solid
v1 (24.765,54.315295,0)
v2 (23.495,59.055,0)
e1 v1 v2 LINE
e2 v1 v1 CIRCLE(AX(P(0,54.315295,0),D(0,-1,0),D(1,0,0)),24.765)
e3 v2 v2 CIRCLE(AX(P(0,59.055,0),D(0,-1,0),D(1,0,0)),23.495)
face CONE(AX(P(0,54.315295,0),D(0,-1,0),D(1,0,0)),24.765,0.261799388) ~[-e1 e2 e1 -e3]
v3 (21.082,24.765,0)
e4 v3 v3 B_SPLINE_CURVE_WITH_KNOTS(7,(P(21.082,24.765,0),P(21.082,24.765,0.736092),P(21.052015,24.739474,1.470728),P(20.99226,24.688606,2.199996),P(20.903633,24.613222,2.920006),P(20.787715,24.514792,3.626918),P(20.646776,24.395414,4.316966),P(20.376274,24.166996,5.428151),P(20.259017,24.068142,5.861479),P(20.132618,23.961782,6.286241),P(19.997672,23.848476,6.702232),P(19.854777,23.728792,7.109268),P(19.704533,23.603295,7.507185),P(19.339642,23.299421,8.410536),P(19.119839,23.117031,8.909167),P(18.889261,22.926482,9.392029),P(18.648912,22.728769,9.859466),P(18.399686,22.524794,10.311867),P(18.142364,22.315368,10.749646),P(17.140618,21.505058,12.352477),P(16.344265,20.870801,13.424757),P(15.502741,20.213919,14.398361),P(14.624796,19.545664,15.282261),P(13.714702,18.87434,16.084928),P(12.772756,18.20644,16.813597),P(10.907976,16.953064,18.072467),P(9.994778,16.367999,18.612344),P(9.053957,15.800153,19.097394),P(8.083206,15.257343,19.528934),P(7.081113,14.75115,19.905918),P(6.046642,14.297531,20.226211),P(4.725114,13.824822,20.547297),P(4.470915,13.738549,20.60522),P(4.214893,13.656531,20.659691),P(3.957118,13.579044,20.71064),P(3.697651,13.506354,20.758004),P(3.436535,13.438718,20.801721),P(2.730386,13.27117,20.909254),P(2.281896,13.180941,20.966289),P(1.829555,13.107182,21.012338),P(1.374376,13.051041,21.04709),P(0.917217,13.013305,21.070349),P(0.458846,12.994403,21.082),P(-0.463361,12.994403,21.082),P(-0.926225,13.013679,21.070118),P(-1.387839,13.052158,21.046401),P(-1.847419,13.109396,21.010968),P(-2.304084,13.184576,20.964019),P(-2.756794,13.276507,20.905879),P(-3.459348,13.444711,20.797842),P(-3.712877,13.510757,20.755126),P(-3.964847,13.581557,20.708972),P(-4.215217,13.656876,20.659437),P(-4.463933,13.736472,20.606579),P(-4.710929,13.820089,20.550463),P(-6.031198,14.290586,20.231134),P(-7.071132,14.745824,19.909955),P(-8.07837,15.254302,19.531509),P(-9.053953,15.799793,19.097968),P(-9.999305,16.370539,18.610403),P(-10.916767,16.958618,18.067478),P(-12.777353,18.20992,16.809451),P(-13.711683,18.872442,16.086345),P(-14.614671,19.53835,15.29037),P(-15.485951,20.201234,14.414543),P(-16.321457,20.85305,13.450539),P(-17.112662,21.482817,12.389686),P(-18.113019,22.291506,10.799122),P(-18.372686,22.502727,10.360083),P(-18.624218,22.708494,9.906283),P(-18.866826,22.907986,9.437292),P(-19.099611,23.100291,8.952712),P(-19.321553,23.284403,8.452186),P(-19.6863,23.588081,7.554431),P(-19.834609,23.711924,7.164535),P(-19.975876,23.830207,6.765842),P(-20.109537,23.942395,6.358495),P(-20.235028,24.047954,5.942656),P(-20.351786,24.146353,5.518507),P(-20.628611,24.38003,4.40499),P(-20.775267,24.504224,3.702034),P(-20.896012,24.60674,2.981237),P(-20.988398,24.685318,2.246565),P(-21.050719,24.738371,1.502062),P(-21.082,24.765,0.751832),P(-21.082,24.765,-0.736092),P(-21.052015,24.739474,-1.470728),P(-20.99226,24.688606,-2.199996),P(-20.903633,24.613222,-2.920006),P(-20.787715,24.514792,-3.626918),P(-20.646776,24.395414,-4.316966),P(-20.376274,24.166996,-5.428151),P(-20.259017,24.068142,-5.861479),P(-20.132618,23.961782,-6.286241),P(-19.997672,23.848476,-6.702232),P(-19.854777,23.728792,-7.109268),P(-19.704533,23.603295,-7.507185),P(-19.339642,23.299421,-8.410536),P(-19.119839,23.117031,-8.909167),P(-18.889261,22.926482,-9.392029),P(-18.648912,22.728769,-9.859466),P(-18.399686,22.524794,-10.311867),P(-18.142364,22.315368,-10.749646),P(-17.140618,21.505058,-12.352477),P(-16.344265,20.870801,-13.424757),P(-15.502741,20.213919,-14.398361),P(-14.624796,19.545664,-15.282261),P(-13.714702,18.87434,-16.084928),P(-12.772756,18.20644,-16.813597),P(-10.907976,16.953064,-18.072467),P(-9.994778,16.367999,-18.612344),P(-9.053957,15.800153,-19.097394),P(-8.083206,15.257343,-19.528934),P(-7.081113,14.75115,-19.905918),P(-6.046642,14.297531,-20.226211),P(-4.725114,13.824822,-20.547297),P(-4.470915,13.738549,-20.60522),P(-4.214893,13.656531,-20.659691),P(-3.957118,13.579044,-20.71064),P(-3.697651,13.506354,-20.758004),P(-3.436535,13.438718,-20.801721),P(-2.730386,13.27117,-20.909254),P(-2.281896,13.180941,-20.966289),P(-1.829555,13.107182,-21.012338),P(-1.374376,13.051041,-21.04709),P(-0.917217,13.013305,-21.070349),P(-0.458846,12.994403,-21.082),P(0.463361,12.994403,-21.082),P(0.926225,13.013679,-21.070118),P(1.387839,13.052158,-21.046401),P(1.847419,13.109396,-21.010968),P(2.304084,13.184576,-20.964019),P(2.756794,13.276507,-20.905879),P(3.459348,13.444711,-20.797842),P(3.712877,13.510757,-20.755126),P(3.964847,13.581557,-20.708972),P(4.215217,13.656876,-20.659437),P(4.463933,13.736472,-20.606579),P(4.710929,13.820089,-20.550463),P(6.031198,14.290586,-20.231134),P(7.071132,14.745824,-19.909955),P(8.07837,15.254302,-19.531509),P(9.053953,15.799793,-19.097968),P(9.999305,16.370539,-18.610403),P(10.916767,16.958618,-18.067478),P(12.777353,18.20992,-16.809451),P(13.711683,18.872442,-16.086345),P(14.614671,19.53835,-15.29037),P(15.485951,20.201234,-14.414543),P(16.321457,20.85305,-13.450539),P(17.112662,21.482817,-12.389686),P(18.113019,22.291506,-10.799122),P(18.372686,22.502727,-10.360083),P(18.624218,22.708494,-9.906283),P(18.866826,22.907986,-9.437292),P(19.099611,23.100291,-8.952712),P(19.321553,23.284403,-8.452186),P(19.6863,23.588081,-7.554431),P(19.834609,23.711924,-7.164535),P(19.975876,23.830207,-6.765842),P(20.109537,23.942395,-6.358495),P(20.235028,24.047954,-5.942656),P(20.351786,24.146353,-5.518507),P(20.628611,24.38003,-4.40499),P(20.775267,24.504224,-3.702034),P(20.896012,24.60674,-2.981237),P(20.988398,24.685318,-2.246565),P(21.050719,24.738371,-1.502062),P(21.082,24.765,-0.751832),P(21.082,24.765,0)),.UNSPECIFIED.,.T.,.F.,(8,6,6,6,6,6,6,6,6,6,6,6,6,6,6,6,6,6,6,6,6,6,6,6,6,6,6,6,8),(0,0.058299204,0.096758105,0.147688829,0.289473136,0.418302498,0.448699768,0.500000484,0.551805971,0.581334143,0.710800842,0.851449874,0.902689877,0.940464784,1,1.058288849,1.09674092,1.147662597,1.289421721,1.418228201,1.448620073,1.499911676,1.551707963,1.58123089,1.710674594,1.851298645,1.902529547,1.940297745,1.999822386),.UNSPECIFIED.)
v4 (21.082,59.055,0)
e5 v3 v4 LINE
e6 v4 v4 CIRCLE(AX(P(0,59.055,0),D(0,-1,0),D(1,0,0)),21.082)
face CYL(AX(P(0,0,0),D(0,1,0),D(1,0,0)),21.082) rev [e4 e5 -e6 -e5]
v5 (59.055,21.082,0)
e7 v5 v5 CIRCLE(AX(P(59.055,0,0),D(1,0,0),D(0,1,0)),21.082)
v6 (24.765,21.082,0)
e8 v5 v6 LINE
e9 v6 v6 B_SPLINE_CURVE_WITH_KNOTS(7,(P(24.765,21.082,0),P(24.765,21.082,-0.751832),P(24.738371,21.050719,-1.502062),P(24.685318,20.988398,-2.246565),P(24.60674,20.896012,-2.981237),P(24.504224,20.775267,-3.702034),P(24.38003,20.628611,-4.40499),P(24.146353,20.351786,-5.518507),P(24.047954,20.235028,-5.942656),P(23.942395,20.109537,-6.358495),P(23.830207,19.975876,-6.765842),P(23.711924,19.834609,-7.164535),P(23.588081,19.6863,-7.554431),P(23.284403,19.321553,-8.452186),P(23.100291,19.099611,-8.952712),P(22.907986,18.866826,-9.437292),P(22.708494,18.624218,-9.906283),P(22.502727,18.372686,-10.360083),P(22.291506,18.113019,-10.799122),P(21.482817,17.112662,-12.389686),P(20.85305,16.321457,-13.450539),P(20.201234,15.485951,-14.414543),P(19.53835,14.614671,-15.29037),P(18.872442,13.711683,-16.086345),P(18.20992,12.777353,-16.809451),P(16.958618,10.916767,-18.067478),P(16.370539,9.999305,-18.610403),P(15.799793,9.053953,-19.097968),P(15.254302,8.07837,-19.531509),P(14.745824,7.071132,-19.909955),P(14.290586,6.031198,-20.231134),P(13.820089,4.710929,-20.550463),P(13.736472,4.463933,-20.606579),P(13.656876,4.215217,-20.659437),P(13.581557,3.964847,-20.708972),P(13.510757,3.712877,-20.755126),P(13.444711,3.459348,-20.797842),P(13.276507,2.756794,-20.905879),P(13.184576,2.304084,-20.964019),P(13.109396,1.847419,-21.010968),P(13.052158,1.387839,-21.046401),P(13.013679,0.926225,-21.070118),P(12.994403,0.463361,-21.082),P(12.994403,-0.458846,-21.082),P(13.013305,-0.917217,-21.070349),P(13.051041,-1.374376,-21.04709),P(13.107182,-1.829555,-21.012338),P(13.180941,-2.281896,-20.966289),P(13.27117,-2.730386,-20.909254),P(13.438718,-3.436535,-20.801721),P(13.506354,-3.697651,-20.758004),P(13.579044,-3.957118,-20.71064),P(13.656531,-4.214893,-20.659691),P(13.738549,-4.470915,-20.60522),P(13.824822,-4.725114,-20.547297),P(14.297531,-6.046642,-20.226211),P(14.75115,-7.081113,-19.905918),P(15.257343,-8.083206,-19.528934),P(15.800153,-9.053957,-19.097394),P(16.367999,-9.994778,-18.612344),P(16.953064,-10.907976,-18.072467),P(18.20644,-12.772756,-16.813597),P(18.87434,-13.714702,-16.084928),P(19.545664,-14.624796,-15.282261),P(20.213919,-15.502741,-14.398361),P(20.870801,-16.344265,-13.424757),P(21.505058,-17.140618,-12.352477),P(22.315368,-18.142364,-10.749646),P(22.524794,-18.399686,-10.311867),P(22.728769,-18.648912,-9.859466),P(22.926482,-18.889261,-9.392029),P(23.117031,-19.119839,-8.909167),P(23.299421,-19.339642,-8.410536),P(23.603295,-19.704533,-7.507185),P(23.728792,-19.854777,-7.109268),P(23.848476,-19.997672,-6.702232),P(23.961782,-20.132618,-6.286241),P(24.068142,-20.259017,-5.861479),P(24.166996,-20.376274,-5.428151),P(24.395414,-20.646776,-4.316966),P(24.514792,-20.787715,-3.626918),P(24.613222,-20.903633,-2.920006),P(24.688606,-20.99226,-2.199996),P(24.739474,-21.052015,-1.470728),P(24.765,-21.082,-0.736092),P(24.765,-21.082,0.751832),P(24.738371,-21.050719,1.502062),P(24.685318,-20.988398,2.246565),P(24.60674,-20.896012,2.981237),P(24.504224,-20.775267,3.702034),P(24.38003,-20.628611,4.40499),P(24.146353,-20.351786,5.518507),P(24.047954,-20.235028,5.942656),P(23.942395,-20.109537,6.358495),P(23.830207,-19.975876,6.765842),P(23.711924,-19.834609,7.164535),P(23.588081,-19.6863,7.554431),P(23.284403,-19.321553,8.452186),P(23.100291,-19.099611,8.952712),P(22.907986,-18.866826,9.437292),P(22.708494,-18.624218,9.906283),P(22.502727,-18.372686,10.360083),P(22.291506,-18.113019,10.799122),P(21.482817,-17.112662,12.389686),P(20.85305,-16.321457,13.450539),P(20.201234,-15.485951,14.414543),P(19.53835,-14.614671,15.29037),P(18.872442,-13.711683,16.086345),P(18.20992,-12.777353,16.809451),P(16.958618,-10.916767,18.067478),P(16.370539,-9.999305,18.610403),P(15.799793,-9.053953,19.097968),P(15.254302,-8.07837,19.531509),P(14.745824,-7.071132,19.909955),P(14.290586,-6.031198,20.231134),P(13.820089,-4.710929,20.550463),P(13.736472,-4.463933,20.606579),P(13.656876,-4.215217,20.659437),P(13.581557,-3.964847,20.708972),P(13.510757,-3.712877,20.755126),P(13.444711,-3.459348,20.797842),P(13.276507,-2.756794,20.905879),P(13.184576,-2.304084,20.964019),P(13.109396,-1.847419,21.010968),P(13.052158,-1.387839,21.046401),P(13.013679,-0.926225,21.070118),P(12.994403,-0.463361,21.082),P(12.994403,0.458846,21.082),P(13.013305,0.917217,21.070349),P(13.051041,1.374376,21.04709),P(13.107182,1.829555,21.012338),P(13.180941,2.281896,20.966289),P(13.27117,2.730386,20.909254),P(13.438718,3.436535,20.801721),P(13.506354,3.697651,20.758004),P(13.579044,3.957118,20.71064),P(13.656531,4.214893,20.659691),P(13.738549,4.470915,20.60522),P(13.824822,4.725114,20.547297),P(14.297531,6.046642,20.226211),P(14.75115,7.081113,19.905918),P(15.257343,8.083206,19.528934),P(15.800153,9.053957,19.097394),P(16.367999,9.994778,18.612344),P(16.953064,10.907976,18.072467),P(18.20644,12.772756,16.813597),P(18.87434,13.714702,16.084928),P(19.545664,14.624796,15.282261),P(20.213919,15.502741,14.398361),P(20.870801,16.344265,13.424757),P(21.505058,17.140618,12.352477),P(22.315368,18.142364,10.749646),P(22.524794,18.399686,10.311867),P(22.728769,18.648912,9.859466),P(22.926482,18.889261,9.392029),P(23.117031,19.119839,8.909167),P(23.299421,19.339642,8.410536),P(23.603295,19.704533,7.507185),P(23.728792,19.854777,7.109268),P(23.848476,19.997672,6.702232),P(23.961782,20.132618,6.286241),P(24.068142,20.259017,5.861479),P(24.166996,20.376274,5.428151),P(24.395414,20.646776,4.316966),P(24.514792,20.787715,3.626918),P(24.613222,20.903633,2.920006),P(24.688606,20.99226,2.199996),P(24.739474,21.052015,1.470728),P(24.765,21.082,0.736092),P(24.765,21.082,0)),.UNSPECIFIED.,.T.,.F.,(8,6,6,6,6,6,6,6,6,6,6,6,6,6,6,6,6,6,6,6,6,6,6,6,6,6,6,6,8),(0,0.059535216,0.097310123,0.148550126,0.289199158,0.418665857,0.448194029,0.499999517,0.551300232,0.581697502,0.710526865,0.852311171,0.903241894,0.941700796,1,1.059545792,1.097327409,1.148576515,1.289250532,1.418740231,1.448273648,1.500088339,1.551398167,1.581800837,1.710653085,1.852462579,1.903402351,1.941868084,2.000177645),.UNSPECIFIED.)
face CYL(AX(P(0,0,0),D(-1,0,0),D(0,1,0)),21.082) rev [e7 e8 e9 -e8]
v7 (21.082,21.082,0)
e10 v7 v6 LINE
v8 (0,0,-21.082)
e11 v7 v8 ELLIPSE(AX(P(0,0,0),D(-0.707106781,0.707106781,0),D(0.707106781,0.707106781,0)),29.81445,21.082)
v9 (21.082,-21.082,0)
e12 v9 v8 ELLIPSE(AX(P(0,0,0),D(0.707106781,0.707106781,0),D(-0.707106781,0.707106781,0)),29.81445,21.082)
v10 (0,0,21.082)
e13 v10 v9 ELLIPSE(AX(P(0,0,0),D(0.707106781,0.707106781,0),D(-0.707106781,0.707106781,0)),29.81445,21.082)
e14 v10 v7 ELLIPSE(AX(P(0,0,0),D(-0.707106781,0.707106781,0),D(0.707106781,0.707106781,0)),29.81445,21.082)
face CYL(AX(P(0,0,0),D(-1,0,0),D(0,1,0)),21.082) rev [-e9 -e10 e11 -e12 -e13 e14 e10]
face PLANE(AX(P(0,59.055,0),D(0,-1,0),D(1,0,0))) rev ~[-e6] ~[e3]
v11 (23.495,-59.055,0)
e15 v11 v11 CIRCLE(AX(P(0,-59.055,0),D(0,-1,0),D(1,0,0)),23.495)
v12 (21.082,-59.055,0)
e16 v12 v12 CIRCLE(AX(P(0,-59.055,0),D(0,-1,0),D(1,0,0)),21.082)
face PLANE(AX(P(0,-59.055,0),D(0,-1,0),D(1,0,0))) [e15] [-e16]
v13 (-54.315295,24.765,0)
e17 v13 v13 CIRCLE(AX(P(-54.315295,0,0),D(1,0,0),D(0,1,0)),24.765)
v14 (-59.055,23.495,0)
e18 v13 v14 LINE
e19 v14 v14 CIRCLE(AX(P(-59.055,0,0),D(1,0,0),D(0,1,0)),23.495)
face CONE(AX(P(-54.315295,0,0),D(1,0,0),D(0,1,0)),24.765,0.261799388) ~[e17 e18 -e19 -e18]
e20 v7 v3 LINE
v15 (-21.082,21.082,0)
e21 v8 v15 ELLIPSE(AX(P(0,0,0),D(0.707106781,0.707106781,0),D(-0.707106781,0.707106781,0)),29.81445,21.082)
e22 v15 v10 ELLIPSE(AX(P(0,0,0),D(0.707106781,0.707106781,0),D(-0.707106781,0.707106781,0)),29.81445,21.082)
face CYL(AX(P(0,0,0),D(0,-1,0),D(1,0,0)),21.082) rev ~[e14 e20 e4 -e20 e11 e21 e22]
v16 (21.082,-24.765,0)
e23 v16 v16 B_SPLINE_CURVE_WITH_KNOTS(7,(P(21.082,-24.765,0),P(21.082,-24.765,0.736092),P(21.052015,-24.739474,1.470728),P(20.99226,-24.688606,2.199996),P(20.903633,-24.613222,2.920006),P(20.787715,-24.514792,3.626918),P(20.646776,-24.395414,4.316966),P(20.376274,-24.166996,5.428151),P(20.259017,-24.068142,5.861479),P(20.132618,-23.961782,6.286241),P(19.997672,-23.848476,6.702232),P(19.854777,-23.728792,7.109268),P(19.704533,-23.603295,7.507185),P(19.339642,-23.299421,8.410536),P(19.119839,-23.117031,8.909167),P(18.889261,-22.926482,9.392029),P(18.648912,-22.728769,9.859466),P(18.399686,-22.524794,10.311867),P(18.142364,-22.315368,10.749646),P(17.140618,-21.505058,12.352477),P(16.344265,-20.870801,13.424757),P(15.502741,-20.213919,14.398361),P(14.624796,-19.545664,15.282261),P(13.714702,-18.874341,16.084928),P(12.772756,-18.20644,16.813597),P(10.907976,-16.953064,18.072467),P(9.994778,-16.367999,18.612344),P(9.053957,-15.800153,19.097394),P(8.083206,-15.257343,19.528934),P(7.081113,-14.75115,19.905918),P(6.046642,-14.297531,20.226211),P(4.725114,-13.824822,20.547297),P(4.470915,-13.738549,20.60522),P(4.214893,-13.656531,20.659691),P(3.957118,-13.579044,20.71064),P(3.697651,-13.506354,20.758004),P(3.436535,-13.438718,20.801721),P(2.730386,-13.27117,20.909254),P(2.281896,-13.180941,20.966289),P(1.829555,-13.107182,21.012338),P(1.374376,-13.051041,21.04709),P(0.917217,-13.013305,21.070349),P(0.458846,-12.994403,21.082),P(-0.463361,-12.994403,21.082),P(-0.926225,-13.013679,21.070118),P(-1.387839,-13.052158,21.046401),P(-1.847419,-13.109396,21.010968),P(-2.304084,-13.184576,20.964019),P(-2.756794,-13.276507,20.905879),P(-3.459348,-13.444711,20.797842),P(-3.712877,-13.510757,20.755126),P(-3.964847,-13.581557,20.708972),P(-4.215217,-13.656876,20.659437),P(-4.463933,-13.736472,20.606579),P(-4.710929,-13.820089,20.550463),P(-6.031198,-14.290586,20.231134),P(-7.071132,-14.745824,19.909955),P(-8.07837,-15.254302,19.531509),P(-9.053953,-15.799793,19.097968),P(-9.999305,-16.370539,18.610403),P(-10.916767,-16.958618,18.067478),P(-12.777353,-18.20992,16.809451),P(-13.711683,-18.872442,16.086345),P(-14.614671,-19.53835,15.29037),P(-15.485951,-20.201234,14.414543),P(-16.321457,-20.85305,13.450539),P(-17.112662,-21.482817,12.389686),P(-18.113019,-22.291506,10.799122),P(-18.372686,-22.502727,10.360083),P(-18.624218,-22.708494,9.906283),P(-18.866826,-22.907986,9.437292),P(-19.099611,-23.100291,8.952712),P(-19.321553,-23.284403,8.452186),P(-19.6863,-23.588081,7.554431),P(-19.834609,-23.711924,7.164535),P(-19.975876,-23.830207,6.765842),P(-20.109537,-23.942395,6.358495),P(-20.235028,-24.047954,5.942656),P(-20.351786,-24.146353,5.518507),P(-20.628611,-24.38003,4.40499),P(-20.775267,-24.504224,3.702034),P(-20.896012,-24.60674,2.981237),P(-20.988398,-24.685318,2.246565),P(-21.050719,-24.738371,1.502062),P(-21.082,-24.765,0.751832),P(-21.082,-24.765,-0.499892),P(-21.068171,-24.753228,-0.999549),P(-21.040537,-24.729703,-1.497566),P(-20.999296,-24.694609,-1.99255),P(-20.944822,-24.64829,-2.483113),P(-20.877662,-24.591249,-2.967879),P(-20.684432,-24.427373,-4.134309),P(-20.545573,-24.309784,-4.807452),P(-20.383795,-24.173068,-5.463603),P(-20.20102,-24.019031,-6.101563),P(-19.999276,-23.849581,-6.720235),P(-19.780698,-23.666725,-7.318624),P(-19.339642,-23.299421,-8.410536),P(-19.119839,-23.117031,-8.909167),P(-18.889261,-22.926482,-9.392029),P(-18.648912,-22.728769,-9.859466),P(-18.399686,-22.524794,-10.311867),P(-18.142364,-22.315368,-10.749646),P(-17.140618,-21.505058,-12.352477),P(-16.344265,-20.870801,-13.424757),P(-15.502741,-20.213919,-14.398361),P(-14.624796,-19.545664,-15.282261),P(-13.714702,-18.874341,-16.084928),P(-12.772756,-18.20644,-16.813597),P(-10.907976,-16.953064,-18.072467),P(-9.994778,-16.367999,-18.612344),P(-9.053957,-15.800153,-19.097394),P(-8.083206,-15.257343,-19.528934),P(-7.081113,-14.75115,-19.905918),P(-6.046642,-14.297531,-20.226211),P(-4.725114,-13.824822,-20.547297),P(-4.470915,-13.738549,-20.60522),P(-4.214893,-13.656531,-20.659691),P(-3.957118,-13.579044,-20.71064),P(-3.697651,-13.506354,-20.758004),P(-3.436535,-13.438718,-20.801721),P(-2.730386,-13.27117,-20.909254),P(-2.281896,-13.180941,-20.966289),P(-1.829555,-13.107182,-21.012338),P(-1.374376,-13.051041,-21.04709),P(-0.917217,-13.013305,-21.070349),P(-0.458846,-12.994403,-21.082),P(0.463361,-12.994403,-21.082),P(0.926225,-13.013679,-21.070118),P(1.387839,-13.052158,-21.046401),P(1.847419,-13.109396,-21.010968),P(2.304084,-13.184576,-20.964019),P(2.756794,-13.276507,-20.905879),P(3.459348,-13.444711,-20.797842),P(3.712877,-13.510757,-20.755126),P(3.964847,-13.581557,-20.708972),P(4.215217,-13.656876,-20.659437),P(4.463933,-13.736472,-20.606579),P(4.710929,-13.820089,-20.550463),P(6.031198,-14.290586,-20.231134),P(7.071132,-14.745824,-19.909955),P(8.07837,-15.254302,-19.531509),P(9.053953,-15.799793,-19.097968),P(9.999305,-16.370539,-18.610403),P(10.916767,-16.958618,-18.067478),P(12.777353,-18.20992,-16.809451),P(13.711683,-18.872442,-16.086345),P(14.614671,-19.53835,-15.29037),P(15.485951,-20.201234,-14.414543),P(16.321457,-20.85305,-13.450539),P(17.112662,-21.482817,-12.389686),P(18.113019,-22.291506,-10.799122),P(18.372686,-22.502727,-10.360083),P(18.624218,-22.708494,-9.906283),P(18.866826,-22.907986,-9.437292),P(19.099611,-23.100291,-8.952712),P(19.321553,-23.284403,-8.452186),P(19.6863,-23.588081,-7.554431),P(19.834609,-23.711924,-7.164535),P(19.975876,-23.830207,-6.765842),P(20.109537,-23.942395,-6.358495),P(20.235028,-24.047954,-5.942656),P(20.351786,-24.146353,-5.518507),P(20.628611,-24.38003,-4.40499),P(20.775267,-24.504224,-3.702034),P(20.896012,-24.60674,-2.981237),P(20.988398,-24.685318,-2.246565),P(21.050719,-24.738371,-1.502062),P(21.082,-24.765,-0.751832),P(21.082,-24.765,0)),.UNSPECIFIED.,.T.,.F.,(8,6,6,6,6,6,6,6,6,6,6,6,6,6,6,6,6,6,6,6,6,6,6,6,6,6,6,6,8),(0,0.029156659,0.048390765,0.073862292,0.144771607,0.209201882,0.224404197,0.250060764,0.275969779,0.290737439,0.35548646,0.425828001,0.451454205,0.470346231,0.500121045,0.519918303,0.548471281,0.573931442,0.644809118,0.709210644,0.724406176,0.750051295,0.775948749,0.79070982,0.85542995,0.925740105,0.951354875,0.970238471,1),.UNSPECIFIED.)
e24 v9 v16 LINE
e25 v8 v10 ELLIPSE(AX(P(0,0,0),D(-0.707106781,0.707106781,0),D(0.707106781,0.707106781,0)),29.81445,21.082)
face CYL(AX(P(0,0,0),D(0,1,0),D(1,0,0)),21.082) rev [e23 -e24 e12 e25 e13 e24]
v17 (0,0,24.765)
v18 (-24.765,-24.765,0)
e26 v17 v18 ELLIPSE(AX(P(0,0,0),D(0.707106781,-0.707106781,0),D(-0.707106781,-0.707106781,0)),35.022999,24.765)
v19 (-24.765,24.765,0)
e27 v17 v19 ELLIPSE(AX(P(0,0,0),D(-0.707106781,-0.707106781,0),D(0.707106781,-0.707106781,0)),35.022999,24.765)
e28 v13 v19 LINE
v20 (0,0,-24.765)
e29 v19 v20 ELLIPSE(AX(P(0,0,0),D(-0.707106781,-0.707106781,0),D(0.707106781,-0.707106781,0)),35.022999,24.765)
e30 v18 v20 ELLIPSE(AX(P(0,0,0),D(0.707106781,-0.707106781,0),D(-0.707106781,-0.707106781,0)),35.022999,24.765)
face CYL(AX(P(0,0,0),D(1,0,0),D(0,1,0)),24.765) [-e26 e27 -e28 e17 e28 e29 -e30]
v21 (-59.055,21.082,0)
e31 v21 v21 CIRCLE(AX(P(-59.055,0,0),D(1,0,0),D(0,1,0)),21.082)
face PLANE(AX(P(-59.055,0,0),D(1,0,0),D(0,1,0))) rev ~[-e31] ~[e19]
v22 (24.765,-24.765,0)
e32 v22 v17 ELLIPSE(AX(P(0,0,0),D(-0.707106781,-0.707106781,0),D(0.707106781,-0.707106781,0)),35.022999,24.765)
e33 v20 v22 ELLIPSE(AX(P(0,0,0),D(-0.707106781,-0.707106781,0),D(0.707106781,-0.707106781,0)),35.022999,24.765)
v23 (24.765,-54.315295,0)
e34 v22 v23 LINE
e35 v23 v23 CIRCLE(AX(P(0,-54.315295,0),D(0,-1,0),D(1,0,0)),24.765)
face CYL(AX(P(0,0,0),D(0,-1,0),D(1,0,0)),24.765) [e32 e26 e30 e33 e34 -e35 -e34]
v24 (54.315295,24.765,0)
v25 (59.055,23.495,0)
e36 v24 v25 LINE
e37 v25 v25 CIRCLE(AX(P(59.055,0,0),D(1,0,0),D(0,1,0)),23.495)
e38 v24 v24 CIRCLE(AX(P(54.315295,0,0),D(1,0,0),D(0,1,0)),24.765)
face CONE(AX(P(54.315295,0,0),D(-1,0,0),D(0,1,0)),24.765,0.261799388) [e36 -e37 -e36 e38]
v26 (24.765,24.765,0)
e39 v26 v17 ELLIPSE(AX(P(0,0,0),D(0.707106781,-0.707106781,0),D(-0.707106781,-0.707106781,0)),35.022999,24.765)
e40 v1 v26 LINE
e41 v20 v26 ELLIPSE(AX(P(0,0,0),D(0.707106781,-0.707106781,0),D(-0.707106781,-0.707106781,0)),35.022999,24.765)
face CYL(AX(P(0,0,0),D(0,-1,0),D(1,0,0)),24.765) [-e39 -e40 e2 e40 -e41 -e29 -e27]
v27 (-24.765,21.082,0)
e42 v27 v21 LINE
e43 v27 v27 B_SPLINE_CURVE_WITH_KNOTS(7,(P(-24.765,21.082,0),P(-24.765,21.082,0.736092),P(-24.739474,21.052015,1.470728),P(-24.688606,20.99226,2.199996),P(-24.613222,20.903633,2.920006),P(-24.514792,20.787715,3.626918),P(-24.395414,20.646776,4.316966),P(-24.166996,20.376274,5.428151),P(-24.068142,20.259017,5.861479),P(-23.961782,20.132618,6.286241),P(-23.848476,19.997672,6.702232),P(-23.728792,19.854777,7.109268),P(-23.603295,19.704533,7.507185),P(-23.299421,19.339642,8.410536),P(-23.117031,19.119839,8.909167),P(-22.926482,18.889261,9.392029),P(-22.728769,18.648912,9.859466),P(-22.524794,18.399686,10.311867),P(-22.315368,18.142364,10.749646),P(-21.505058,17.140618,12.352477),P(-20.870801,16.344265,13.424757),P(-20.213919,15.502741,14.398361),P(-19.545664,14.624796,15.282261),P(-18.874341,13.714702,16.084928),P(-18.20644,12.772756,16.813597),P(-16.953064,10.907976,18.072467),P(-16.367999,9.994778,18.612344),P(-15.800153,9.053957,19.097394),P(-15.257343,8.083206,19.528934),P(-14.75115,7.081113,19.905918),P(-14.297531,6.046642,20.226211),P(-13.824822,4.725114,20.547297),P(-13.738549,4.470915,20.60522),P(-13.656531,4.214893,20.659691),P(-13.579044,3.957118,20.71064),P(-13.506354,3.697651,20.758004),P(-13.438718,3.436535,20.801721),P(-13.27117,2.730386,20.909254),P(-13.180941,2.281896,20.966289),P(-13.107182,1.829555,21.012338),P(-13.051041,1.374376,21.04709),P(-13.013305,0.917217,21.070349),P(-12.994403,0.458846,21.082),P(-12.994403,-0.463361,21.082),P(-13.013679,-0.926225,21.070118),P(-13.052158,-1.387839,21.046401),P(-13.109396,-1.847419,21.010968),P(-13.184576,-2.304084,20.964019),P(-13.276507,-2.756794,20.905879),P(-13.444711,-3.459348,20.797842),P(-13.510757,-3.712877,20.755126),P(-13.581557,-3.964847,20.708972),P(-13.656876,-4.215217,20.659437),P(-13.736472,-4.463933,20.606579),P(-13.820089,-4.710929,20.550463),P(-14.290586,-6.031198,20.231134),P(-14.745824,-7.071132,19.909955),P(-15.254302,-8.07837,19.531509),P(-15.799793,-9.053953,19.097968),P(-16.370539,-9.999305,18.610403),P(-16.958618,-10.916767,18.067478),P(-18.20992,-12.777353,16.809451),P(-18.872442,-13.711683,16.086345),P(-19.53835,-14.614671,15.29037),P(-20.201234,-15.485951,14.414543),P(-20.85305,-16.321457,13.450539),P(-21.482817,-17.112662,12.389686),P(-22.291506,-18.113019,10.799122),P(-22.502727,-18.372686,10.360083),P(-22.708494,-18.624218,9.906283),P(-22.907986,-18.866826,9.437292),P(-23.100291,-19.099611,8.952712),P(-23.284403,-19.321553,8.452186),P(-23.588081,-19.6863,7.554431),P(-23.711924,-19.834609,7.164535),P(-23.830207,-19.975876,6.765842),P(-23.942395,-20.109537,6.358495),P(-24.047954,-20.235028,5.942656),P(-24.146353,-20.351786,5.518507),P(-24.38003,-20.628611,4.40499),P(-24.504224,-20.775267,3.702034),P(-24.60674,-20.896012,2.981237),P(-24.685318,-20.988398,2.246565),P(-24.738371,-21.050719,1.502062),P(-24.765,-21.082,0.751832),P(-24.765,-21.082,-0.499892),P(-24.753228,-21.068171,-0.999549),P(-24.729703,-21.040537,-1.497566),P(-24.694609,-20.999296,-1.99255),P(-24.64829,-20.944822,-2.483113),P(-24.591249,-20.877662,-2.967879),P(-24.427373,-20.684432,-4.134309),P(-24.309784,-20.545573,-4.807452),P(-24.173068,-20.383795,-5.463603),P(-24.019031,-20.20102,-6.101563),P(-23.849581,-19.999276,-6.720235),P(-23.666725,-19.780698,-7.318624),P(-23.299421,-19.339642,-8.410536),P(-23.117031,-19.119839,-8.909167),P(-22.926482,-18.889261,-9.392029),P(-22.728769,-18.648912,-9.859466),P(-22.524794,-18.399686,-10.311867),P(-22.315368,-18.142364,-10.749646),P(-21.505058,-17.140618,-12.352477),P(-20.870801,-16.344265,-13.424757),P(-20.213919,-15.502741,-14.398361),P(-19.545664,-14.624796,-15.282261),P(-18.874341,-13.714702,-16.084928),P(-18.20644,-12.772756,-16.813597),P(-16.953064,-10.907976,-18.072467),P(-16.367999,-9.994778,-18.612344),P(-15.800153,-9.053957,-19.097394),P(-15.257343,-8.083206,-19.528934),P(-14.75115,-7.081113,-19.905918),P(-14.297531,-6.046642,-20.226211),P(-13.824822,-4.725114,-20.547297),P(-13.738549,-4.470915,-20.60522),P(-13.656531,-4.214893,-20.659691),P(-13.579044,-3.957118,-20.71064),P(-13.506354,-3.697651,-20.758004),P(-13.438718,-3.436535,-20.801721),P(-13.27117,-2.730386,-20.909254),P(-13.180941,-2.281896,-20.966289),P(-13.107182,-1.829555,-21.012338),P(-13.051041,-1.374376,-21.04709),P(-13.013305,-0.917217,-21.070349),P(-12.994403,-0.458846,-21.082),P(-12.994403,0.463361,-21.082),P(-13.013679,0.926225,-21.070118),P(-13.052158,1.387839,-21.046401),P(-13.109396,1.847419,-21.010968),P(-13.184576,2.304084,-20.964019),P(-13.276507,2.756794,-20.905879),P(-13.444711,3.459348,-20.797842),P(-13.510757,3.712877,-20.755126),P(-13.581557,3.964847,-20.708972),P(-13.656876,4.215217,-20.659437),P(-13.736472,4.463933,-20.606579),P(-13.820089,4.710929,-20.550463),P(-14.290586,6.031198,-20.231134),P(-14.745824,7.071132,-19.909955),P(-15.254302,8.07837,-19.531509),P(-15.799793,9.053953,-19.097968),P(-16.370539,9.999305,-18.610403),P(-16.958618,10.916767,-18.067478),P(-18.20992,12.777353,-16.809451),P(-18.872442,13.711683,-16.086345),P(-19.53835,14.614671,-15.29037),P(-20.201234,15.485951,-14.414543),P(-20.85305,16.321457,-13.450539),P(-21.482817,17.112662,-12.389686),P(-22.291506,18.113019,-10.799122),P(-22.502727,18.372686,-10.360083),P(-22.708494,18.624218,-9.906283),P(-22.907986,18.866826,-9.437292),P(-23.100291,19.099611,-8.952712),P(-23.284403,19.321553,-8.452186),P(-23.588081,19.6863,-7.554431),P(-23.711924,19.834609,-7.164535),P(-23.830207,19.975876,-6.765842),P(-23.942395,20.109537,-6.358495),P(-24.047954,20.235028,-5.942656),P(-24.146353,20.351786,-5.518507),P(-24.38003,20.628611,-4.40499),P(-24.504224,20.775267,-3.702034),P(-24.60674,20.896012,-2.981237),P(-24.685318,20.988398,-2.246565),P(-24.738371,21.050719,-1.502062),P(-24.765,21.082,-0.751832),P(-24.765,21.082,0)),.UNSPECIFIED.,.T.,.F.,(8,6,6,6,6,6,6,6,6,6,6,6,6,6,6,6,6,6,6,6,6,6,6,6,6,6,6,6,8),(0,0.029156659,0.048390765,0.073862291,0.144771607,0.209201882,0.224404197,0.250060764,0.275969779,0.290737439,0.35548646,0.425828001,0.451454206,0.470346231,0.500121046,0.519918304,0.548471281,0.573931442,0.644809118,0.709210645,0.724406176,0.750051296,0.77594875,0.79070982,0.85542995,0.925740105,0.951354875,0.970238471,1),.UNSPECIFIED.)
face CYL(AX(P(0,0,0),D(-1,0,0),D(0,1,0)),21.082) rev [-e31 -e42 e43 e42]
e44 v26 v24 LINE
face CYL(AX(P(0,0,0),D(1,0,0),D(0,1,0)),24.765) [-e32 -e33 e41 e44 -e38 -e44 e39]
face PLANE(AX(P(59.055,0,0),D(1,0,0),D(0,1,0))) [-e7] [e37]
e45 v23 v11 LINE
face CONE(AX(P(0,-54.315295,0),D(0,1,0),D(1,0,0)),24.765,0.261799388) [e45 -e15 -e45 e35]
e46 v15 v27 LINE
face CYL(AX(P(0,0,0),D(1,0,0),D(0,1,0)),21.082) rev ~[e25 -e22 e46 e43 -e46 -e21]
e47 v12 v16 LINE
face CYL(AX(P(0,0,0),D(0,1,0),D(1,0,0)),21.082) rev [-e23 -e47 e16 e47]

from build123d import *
from build123d import SkipClean  # not in build123d's __all__

# Parameters (mm, degrees)
F0_R          = 24.765
F0_R_2        = 21.082
F1_DEPTH      = 59.055
F2_R          = 24.765
F2_R_2        = 21.082
F3_DEPTH      = 59.055
F4_DEPTH      = 59.0560001
F4_DEPTH_BACK = 59.0560001
F5_DEPTH      = 59.0560001
F5_DEPTH_BACK = 59.0560001
F6_SIZE2      = 1.27
F6_SIZE       = 4.7397045256
F6_2_SIZE2    = 1.27
F6_2_SIZE     = 4.7397045256
F6_3_SIZE2    = 1.27
F6_3_SIZE     = 4.7397045256
F6_4_SIZE2    = 1.27
F6_4_SIZE     = 4.7397045256


# Not quite as in the source:
# - two fillets or chamfers of one size are made in one step


with BuildPart() as f1:
    # F0 (on Front) → F1 (new body, symmetric)
    with BuildSketch(Plane.XZ):
        Circle(F0_R)
        Circle(F0_R_2, mode=Mode.SUBTRACT)
    extrude(amount=F1_DEPTH, both=True)

    # F2 (on Right) → F3 (join, symmetric)
    with BuildSketch(Plane.YZ):
        Circle(F2_R)
        Circle(F2_R_2, mode=Mode.SUBTRACT)
    extrude(amount=F3_DEPTH, both=True)

    # F2 (on Right) → F4 (cut, two sides)
    with BuildSketch(Plane.YZ) as f4_sk:
        Circle(F2_R_2)
    with SkipClean():  # cleaning this boolean's faces spoils the solid; the shape is the same uncleaned
        extrude(amount=F4_DEPTH, mode=Mode.SUBTRACT)
        extrude(f4_sk.sketch, amount=-F4_DEPTH_BACK, mode=Mode.SUBTRACT)

    # F0 (on Front) → F5 (cut, two sides)
    with BuildSketch(Plane.XZ) as f5_sk:
        Circle(F0_R_2)
    extrude(amount=F5_DEPTH, mode=Mode.SUBTRACT)
    extrude(f5_sk.sketch, amount=-F5_DEPTH_BACK, mode=Mode.SUBTRACT)

    # F6
    f6_edges = [f1.edges().sort_by_distance(p)[0] for p in [
        (-59.055, -24.765, 0),
    ]]
    f6_side = f1.faces().sort_by_distance((-29.5275, -24.765, 0))[0]
    chamfer(f6_edges, length=F6_SIZE, length2=F6_SIZE2, reference=f6_side)

    # F6#2
    f6_2_edges = [f1.edges().sort_by_distance(p)[0] for p in [
        (59.055, -24.765, 0),
    ]]
    f6_2_side = f1.faces().sort_by_distance((29.5275, -24.765, 0))[0]
    chamfer(f6_2_edges, length=F6_2_SIZE, length2=F6_2_SIZE2, reference=f6_2_side)

    # F6#3
    f6_3_edges = [f1.edges().sort_by_distance(p)[0] for p in [
        (-24.765, -59.055, 0),
    ]]
    f6_3_side = f1.faces().sort_by_distance((-24.765, -29.5275, 0))[0]
    chamfer(f6_3_edges, length=F6_3_SIZE, length2=F6_3_SIZE2, reference=f6_3_side)

    # F6#4
    f6_4_edges = [f1.edges().sort_by_distance(p)[0] for p in [
        (-24.765, 59.055, 0),
    ]]
    f6_4_side = f1.faces().sort_by_distance((-24.765, 29.5275, 0))[0]
    chamfer(f6_4_edges, length=F6_4_SIZE, length2=F6_4_SIZE2, reference=f6_4_side)


solid = f1.part
